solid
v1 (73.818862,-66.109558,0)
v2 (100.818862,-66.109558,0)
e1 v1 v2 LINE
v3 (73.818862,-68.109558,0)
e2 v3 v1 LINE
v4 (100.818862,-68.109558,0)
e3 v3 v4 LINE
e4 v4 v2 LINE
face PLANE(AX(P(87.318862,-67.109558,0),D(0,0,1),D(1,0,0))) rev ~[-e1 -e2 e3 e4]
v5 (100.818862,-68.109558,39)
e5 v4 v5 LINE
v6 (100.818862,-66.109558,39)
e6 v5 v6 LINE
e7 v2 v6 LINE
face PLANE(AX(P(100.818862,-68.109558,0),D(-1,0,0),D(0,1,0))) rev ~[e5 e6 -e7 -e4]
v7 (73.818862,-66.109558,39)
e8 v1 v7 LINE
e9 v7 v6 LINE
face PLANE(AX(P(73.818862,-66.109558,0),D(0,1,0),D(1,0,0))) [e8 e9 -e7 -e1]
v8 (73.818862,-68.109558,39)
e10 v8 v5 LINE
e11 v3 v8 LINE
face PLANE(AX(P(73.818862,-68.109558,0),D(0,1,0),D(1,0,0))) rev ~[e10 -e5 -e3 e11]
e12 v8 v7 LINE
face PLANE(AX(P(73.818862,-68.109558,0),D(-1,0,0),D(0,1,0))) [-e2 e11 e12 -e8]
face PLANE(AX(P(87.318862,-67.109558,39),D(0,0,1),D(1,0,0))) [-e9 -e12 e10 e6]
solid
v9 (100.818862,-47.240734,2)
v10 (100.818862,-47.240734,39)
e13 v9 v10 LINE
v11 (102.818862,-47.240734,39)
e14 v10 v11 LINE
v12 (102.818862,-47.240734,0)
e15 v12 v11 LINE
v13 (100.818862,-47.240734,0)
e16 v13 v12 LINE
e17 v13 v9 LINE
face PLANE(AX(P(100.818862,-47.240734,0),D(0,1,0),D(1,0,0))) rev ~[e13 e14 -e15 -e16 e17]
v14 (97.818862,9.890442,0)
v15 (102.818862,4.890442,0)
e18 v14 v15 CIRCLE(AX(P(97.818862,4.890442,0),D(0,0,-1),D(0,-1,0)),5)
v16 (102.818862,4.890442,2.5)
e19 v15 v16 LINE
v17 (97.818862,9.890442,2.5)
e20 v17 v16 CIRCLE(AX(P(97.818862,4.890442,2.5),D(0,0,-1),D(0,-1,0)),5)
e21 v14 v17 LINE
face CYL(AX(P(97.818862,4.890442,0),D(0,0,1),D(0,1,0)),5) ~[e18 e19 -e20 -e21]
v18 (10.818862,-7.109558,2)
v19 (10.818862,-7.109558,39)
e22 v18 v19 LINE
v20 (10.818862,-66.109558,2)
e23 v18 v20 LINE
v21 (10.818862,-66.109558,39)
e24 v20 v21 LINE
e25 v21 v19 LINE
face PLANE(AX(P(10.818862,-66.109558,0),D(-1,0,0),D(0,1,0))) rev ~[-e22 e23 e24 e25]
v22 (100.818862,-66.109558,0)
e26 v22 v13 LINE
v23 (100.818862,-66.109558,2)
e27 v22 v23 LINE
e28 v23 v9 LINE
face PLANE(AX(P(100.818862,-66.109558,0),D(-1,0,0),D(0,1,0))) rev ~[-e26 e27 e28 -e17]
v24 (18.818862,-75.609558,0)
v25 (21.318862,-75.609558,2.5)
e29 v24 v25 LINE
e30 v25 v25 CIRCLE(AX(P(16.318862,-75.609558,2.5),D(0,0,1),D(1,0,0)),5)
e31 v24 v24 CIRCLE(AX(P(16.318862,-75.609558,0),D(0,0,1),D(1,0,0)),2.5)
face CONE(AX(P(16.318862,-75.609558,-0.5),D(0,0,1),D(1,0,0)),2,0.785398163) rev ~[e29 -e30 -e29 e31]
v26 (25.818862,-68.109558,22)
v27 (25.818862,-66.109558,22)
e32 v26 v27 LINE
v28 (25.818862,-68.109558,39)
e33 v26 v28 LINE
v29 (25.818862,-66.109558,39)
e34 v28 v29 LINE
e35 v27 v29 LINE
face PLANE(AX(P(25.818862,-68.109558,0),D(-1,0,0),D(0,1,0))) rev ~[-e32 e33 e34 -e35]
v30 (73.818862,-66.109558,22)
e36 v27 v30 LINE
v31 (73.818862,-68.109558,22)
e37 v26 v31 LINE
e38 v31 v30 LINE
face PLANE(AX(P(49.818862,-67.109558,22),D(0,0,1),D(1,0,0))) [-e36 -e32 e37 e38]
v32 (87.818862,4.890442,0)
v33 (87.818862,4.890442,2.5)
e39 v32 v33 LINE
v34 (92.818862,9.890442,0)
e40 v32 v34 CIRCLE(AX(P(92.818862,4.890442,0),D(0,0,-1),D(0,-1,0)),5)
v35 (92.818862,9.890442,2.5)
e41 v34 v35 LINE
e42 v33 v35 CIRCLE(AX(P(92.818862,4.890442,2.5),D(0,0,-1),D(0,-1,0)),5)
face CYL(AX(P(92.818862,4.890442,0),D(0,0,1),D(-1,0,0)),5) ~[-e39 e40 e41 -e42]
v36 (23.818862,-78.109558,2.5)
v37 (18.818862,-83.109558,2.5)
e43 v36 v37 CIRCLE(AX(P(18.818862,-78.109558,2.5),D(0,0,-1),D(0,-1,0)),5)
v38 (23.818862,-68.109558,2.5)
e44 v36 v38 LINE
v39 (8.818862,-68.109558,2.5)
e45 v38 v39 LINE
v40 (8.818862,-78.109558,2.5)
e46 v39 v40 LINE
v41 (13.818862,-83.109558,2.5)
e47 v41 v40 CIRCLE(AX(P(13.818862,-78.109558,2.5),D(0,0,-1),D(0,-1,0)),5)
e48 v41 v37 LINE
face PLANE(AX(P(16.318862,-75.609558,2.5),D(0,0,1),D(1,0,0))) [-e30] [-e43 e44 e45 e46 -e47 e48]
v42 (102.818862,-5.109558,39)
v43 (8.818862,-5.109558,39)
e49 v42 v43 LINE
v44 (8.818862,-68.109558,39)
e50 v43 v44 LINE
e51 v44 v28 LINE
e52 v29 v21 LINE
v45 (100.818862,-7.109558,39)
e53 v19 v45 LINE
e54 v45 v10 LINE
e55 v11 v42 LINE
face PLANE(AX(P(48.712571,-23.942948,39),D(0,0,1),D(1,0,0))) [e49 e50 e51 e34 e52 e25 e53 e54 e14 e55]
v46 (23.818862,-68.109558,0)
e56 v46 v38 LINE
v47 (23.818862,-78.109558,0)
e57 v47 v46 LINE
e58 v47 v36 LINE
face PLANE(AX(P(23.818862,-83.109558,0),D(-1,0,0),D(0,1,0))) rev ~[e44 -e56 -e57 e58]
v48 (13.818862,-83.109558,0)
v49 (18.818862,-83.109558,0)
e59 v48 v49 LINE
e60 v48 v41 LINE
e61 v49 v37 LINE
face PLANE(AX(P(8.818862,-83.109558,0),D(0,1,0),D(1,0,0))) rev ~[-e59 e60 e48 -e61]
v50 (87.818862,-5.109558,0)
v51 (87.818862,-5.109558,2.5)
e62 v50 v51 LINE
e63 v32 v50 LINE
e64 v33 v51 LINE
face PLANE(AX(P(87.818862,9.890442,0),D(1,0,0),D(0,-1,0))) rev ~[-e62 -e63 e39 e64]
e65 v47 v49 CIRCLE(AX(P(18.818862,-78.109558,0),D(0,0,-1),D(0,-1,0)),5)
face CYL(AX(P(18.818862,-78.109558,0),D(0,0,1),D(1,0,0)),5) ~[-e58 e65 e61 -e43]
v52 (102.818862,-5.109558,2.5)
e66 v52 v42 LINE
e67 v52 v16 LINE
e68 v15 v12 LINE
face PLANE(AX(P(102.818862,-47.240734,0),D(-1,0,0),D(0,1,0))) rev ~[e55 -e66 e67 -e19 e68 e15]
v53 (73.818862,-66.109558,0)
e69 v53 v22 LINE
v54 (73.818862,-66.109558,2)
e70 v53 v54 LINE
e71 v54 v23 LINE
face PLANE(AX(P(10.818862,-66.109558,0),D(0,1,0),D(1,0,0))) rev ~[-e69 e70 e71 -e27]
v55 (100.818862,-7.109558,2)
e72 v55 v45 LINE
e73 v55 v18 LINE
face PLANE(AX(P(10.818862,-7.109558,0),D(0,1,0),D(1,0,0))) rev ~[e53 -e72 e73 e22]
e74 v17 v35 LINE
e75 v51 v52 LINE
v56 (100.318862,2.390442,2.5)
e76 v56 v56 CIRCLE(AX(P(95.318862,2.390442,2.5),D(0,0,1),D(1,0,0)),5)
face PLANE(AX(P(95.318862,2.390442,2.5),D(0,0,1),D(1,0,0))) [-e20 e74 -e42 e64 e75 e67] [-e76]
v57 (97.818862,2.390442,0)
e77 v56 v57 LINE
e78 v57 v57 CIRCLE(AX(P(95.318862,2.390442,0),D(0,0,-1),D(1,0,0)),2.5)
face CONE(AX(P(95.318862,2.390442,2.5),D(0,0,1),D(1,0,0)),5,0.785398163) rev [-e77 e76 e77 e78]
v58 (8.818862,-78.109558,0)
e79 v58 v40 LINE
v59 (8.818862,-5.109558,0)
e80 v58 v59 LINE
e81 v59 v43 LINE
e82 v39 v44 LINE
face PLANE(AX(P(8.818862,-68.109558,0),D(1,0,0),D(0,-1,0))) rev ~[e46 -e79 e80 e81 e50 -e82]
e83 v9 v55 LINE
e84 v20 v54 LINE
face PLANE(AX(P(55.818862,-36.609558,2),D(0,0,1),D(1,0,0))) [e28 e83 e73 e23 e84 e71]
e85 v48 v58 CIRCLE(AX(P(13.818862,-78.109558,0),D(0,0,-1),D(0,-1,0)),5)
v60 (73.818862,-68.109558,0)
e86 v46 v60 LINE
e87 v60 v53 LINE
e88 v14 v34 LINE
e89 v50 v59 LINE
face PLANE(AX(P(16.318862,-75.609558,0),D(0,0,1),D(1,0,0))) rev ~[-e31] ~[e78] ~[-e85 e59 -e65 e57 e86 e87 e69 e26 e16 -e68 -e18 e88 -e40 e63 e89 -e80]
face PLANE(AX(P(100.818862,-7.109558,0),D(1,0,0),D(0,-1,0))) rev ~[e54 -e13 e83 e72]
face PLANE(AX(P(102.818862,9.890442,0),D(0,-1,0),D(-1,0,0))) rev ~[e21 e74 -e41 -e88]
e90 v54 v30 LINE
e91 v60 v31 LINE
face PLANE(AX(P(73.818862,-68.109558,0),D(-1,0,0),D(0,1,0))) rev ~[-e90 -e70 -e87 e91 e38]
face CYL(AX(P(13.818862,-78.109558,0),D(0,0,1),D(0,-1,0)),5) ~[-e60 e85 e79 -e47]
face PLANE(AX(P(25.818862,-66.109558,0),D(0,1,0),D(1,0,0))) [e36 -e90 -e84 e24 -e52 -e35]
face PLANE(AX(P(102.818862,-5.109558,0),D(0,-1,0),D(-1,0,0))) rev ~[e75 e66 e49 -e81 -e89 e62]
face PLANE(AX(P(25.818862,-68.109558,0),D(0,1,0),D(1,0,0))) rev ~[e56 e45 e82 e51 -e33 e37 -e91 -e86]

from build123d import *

# Parameters (mm, degrees)
F1_DEPTH = 39
F0_W     = 27
F0_H     = 2
F0_W_2   = 48
F2_DEPTH = 22
F3_DEPTH = 2
F0_R     = 2
F4_DEPTH = 2.5
F6_R     = 5


# Not quite as in the source:
# - a fillet or chamfer that OpenCascade refuses, or shapes differently, is made with other operations: its cross-section is extruded or revolved along the edge and cut away or added


with BuildPart() as f1:
    # F0 (on Top) → F1 (new body)
    with BuildSketch(Plane.XY):
        Polygon((10.8188620284, -66.1095576286), (10.8188620284, -7.1095576286), (100.8188620284, -7.1095576286), (100.8188620284, -47.2407341003), (102.8188620284, -47.2407341003), (102.8188620284, -7.5), (102.8188620284, -7.1095576286), (102.8188620284, -5.1095576286), (100.8188620284, -5.1095576286), (87.8188620284, -5.1095576286), (10.8188620284, -5.1095576286), (8.8188620284, -5.1095576286), (8.8188620284, -68.1095576286), (10.8188620284, -68.1095576286), (23.8188620284, -68.1095576286), (25.8188620284, -68.1095576286), (25.8188620284, -66.1095576286), align=None)
    extrude(amount=F1_DEPTH)

    # F0 (on Top) → F2 (join)
    with BuildSketch(Plane.XY):
        with Locations((49.8188620284, -67.1095576286)):
            Rectangle(F0_W_2, F0_H)
    extrude(amount=F2_DEPTH)

    # F0 (on Top) → F3 (join)
    with BuildSketch(Plane.XY):
        Polygon((100.8188620284, -7.1095576286), (10.8188620284, -7.1095576286), (10.8188620284, -66.1095576286), (25.8188620284, -66.1095576286), (73.8188620284, -66.1095576286), (100.8188620284, -66.1095576286), (100.8188620284, -47.2407341003), align=None)
    extrude(amount=F3_DEPTH)

    # F0 (on Top) → F4 (join)
    with BuildSketch(Plane.XY):
        Polygon((23.8188620284, -83.1095576286), (23.8188620284, -68.1095576286), (10.8188620284, -68.1095576286), (8.8188620284, -68.1095576286), (8.8188620284, -83.1095576286), align=None)
        with Locations((16.3188620284, -75.6095576286)):
            Circle(F0_R, mode=Mode.SUBTRACT)
        Polygon((100.8188620284, -5.1095576286), (102.8188620284, -5.1095576286), (102.8188620284, 9.8904423714), (87.8188620284, 9.8904423714), (87.8188620284, -5.1095576286), align=None)
        with Locations((95.3188620284, 2.3904423714)):
            Circle(F0_R, mode=Mode.SUBTRACT)
    extrude(amount=F4_DEPTH)

    # F5: chamfer of 3 on 2 edges, made by hand

    # F5_s1 → F5_t2 (revolve, cut)
    with BuildSketch(Plane.XZ.offset(75.6095576286)):
        Polygon((18.3188620284, -0.5), (21.3188620284, 2.5), (18.3188620284, 2.5), align=None)
    revolve(axis=Axis((16.3188620284, -75.6095576286, 2.5), (0, 0, 1)), mode=Mode.SUBTRACT)

    # F5_s3 → F5_t4 (revolve, cut)
    with BuildSketch(Plane.XZ.offset(-2.3904423714)):
        Polygon((100.3188620284, 2.5), (97.3188620284, -0.5), (97.3188620284, 2.5), align=None)
    revolve(axis=Axis((95.3188620284, 2.3904423714, 2.5), (0, 0, 1)), mode=Mode.SUBTRACT)

    # F6
    f6_edges = [f1.edges().sort_by_distance(p)[0] for p in [
        (102.818862, 9.890442, 1.25),
        (87.818862, 9.890442, 1.25),
        (8.818862, -83.109558, 1.25),
        (23.818862, -83.109558, 1.25),
    ]]
    fillet(f6_edges, radius=F6_R)


with BuildPart() as f1b:
    # F0 (on Top) → F1, piece 2 (new body)
    with BuildSketch(Plane.XY):
        with Locations((87.3188620284, -67.1095576286)):
            Rectangle(F0_W, F0_H)
    extrude(amount=F1_DEPTH)


solid = Compound([f1.part, f1b.part])
